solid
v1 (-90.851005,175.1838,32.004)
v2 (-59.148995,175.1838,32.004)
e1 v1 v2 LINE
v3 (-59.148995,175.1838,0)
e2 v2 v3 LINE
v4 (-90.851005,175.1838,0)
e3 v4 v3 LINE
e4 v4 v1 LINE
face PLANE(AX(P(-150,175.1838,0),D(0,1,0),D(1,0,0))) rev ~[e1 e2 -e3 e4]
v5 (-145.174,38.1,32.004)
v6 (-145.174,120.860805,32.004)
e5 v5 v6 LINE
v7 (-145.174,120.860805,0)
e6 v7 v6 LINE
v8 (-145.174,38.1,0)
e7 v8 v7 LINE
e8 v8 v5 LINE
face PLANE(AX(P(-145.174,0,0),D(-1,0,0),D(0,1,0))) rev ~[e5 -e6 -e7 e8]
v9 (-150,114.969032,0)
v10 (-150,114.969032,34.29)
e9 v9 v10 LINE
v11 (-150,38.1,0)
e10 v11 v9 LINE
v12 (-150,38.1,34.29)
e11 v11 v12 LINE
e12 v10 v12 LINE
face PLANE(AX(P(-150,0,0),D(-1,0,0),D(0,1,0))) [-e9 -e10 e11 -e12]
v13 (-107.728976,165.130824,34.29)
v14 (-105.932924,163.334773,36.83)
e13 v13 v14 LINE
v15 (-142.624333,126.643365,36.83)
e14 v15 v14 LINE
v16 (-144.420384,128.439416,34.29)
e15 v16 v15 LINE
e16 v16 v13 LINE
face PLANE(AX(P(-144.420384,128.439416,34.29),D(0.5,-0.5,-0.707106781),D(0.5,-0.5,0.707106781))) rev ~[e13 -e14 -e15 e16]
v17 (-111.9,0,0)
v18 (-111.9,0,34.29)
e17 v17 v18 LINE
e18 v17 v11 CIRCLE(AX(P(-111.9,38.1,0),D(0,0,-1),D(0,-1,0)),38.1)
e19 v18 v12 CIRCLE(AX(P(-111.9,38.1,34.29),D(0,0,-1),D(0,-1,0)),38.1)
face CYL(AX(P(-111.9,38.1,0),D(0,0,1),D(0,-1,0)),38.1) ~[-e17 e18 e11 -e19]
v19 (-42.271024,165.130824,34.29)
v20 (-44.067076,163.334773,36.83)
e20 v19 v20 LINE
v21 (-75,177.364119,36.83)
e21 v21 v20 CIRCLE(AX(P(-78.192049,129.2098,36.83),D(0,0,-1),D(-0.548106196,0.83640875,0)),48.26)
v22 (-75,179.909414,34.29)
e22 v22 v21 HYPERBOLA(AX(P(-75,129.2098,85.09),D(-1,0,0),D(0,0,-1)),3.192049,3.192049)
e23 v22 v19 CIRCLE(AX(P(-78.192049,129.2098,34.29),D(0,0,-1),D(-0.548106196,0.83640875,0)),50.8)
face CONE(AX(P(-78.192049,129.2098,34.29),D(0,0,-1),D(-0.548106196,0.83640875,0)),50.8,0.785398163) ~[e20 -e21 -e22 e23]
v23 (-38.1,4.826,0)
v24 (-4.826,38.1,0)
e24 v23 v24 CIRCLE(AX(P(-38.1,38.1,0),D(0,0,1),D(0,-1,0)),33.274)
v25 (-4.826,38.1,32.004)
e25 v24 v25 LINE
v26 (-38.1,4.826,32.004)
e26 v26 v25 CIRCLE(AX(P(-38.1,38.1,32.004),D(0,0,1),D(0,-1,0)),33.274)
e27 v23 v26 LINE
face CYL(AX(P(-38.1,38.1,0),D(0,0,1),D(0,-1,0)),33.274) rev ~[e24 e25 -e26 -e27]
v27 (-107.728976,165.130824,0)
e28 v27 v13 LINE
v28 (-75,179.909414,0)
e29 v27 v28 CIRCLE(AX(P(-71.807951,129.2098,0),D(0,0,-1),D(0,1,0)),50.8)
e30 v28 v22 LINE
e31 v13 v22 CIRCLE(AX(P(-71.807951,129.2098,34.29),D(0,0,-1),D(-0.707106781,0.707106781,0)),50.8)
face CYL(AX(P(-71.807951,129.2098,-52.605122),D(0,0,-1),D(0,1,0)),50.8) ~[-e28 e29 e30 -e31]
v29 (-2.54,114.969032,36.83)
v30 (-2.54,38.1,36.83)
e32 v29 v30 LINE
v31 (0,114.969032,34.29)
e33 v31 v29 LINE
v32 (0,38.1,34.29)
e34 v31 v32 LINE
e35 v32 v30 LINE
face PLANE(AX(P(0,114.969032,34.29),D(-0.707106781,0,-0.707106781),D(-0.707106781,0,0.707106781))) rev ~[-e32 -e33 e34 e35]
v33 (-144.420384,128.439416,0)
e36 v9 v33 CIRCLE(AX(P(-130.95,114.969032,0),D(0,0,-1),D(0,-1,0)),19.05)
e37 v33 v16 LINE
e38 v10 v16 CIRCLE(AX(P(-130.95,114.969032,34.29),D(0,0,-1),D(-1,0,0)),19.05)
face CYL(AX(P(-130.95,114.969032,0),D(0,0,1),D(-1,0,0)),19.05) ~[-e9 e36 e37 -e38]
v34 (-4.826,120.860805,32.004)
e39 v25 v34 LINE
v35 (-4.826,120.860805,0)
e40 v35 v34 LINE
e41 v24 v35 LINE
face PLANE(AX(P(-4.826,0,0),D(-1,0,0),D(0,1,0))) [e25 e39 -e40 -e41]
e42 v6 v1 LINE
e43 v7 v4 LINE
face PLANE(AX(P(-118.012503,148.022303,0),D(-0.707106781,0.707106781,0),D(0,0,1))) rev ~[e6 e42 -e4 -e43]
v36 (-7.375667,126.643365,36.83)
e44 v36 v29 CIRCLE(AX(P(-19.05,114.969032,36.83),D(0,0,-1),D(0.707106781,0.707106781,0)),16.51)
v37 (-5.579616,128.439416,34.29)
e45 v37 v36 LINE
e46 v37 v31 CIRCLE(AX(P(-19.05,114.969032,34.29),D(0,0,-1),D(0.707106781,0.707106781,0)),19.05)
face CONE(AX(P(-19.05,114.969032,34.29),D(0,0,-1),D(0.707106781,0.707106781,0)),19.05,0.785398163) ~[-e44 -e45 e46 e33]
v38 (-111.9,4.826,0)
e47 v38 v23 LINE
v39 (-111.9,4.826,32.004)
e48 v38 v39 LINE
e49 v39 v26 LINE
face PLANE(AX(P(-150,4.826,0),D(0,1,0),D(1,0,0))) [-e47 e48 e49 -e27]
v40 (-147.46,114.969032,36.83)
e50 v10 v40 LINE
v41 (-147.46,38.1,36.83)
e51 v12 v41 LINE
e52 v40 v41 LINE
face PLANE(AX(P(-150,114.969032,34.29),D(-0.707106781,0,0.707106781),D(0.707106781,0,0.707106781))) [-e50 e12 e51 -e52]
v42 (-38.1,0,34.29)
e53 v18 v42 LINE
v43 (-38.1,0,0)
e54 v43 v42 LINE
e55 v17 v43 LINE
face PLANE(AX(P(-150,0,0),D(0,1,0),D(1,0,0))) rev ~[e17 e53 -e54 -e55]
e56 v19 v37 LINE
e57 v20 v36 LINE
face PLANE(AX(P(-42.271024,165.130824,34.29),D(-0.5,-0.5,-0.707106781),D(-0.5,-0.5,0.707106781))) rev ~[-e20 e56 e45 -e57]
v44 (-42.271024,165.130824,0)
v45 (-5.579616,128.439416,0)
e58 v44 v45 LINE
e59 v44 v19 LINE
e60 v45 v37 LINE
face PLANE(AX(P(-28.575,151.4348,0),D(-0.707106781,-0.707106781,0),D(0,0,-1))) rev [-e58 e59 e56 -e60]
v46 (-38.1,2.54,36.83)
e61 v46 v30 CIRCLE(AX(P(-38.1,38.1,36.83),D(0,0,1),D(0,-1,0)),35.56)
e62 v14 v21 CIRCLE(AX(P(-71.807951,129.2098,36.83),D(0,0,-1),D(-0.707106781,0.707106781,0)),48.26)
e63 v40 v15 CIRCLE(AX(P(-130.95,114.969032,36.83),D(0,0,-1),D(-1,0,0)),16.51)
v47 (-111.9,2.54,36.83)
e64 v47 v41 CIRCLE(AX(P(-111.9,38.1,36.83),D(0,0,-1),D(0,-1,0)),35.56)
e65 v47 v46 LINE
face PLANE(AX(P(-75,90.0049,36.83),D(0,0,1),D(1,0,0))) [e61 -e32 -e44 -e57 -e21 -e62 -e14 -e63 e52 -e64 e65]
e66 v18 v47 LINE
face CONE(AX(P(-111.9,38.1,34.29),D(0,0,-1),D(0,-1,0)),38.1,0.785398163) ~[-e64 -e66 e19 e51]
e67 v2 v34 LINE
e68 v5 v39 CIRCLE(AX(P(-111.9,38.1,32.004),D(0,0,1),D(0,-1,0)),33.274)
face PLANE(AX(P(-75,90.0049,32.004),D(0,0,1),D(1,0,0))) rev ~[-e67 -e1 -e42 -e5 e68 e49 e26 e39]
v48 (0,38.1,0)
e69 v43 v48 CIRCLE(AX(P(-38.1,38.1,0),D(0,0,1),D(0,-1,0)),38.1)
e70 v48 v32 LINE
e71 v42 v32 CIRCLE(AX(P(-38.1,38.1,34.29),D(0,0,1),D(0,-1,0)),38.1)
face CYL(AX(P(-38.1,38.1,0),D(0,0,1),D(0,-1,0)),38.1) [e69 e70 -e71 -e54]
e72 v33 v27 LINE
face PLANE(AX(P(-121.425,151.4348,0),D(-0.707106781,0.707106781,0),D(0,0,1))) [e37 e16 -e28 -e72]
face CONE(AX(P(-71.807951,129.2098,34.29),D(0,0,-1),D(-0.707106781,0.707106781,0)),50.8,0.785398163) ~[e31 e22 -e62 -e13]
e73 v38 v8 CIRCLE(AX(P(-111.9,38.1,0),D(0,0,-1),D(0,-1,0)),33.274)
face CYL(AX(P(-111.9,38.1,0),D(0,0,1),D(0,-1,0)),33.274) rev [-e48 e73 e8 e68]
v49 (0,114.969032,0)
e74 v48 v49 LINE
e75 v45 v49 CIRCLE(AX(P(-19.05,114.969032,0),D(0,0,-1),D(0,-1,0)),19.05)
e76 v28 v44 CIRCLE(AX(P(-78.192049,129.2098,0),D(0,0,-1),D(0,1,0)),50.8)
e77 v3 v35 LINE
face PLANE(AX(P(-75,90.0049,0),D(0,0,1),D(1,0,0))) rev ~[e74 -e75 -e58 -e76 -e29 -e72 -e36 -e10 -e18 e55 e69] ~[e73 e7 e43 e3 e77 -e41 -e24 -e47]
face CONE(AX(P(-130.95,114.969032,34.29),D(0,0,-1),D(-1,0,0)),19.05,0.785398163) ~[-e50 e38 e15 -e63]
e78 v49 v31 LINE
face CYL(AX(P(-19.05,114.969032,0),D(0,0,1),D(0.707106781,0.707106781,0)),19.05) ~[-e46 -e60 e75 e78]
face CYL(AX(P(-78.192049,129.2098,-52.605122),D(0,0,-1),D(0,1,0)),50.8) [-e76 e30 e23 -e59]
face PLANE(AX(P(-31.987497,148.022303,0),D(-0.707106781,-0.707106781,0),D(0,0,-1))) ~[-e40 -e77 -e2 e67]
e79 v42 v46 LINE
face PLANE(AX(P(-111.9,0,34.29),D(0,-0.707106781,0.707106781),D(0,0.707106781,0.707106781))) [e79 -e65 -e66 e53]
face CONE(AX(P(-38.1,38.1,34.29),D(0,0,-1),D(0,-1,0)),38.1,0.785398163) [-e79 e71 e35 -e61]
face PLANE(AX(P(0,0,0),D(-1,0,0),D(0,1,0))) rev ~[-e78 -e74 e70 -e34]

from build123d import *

# Parameters (mm, degrees)
F0_W         = 150
F0_H         = 180.0098
F1_DEPTH     = 36.83
F2_R         = 38.1
F3_R         = 38.1
F4_SIZE      = 57.15
F5_SIZE      = 57.15
F6_T         = -4.826
F7_T1_DEPTH  = 142.0402448428
F8_R         = 19.05
F9_T1_DEPTH  = 51.8894877579
F9_T3_DEPTH  = 76.8690316368
F9_T5_DEPTH  = 73.8
F9_T7_DEPTH  = 51.8894877579
F9_T10_ANGLE = 78.2371868637
F9_T12_ANGLE = 78.2371868637
F9_T14_ANGLE = 45
F9_T16_ANGLE = 90
F9_T18_ANGLE = 90
F9_T20_ANGLE = 45


# Not quite as in the source:
# - a fillet or chamfer that OpenCascade refuses, or shapes differently, is made with other operations: its cross-section is extruded or revolved along the edge and cut away or added


with BuildPart() as f1:
    # F0 (on Top) → F1 (new body)
    with BuildSketch(Plane.XY):
        with Locations((-75, 90.0049)):
            Rectangle(F0_W, F0_H)
    extrude(amount=F1_DEPTH)

    # F2
    f2_edges = [f1.edges().sort_by_distance(p)[0] for p in [
        (0, 0, 18.415),
    ]]
    fillet(f2_edges, radius=F2_R)

    # F3
    f3_edges = [f1.edges().sort_by_distance(p)[0] for p in [
        (-150, 0, 18.415),
    ]]
    fillet(f3_edges, radius=F3_R)

    # F4
    f4_edges = [f1.edges().sort_by_distance(p)[0] for p in [
        (-150, 180.0098, 18.415),
    ]]
    chamfer(f4_edges, length=F4_SIZE)

    # F5
    f5_edges = [f1.edges().sort_by_distance(p)[0] for p in [
        (0, 180.0098, 18.415),
    ]]
    chamfer(f5_edges, length=F5_SIZE)

    # F6
    f6_openings = [f1.faces().sort_by_distance(p)[0] for p in [
        (-75, 82.174731, 0),
    ]]
    offset(amount=F6_T, openings=f6_openings)

    # F7: fillet of radius 50.8 on 2 edges, made by hand

    # F7_s2 → F7_t1 (cut)
    with BuildSketch(Plane.XY.offset(-52.6051224214)):
        with BuildLine():
            ThreePointArc((-71.8079510314, 180.0098), (-91.2482693956, 176.1428802516), (-107.7289755157, 165.1308244843))
            Line((-107.7289755157, 165.1308244843), (-92.85, 180.0098))
            Line((-92.85, 180.0098), (-71.8079510314, 180.0098))
        make_face()
        with BuildLine():
            ThreePointArc((-78.1920489686, 180.0098), (-58.7517306044, 176.1428802516), (-42.2710244843, 165.1308244843))
            Line((-42.2710244843, 165.1308244843), (-57.15, 180.0098))
            Line((-57.15, 180.0098), (-78.1920489686, 180.0098))
        make_face()
    extrude(amount=F7_T1_DEPTH, mode=Mode.SUBTRACT)

    # F8
    f8_edges = [f1.edges().sort_by_distance(p)[0] for p in [
        (-150, 122.8598, 18.415),
        (0, 122.8598, 18.415),
    ]]
    fillet(f8_edges, radius=F8_R)

    # F9: chamfer of 2.54 on 10 edges, made by hand

    # F9_s2 → F9_t1 (cut)
    with BuildSketch(Plane(origin=(-7.9904841816, -7.9904841816, 0), x_dir=(0, 0, 1), z_dir=(0.7071067812, 0.7071067812, 0))):
        Polygon((34.29, -192.9410148932), (36.83, -190.4010148932), (36.83, -192.9410148932), align=None)
    extrude(amount=F9_T1_DEPTH, mode=Mode.SUBTRACT)

    # F9_s4 → F9_t3 (cut)
    with BuildSketch(Plane.XZ.offset(-114.9690316368)):
        Polygon((-150, 34.29), (-147.46, 36.83), (-150, 36.83), align=None)
        Polygon((0, 34.29), (-2.54, 36.83), (0, 36.83), align=None)
    extrude(amount=F9_T3_DEPTH, mode=Mode.SUBTRACT)

    # F9_s6 → F9_t5 (cut)
    with BuildSketch(Plane.YZ.offset(-111.9)):
        Polygon((0, 34.29), (2.54, 36.83), (0, 36.83), align=None)
    extrude(amount=F9_T5_DEPTH, mode=Mode.SUBTRACT)

    # F9_s8 → F9_t7 (cut)
    with BuildSketch(Plane(origin=(-103.7009244843, 103.7009244843, 0), x_dir=(0, 0, 1), z_dir=(0.7071067812, -0.7071067812, 0))):
        Polygon((34.29, -86.8749977152), (36.83, -84.3349977152), (36.83, -86.8749977152), align=None)
    extrude(amount=F9_T7_DEPTH, mode=Mode.SUBTRACT)

    # F9_s9 → F9_t10 (revolve, cut)
    with BuildSketch(Plane(origin=(4.5334842912, 2.9708331336, 0), x_dir=(0, 0, 1), z_dir=(-0.8364087505, -0.548106196, 0))):
        Polygon((34.29, 201.7297538876), (36.83, 199.1897538876), (36.83, 201.7297538876), align=None)
    revolve(axis=Axis((-78.1920489684, 129.2098000003, 36.83), (0, 0, -1)), revolution_arc=F9_T10_ANGLE, mode=Mode.SUBTRACT)

    # F9_s11 → F9_t12 (revolve, cut)
    with BuildSketch(Plane(origin=(28.7009244845, 28.7009244846, 0), x_dir=(0, 0, 1), z_dir=(-0.7071067812, -0.7071067812, 0))):
        Polygon((34.29, 192.9410148931), (36.83, 190.4010148931), (36.83, 192.9410148931), align=None)
    revolve(axis=Axis((-71.8079510316, 129.2098000003, 36.83), (0, 0, -1)), revolution_arc=F9_T12_ANGLE, mode=Mode.SUBTRACT)

    # F9_s13 → F9_t14 (revolve, cut)
    with BuildSketch(Plane.XZ.offset(-114.9690316368)):
        Polygon((-150, 34.29), (-147.46, 36.83), (-150, 36.83), align=None)
    revolve(axis=Axis((-130.95, 114.9690316368, 36.83), (0, 0, -1)), revolution_arc=F9_T14_ANGLE, mode=Mode.SUBTRACT)

    # F9_s15 → F9_t16 (revolve, cut)
    with BuildSketch(Plane.YZ.offset(-111.9)):
        Polygon((0, 34.29), (2.54, 36.83), (0, 36.83), align=None)
    revolve(axis=Axis((-111.9, 38.1, 36.83), (0, 0, -1)), revolution_arc=F9_T16_ANGLE, mode=Mode.SUBTRACT)

    # F9_s17 → F9_t18 (revolve, cut)
    with BuildSketch(Plane.YZ.offset(-38.1)):
        Polygon((0, 34.29), (2.54, 36.83), (0, 36.83), align=None)
    revolve(axis=Axis((-38.1, 38.1, 36.83), (0, 0, 1)), revolution_arc=F9_T18_ANGLE, mode=Mode.SUBTRACT)

    # F9_s19 → F9_t20 (revolve, cut)
    with BuildSketch(Plane(origin=(-67.0095158184, 67.0095158184, 0), x_dir=(0, 0, 1), z_dir=(-0.7071067812, 0.7071067812, 0))):
        Polygon((34.29, 86.8749977152), (36.83, 84.3349977152), (36.83, 86.8749977152), align=None)
    revolve(axis=Axis((-19.05, 114.9690316368, 36.83), (0, 0, -1)), revolution_arc=F9_T20_ANGLE, mode=Mode.SUBTRACT)


solid = f1.part
